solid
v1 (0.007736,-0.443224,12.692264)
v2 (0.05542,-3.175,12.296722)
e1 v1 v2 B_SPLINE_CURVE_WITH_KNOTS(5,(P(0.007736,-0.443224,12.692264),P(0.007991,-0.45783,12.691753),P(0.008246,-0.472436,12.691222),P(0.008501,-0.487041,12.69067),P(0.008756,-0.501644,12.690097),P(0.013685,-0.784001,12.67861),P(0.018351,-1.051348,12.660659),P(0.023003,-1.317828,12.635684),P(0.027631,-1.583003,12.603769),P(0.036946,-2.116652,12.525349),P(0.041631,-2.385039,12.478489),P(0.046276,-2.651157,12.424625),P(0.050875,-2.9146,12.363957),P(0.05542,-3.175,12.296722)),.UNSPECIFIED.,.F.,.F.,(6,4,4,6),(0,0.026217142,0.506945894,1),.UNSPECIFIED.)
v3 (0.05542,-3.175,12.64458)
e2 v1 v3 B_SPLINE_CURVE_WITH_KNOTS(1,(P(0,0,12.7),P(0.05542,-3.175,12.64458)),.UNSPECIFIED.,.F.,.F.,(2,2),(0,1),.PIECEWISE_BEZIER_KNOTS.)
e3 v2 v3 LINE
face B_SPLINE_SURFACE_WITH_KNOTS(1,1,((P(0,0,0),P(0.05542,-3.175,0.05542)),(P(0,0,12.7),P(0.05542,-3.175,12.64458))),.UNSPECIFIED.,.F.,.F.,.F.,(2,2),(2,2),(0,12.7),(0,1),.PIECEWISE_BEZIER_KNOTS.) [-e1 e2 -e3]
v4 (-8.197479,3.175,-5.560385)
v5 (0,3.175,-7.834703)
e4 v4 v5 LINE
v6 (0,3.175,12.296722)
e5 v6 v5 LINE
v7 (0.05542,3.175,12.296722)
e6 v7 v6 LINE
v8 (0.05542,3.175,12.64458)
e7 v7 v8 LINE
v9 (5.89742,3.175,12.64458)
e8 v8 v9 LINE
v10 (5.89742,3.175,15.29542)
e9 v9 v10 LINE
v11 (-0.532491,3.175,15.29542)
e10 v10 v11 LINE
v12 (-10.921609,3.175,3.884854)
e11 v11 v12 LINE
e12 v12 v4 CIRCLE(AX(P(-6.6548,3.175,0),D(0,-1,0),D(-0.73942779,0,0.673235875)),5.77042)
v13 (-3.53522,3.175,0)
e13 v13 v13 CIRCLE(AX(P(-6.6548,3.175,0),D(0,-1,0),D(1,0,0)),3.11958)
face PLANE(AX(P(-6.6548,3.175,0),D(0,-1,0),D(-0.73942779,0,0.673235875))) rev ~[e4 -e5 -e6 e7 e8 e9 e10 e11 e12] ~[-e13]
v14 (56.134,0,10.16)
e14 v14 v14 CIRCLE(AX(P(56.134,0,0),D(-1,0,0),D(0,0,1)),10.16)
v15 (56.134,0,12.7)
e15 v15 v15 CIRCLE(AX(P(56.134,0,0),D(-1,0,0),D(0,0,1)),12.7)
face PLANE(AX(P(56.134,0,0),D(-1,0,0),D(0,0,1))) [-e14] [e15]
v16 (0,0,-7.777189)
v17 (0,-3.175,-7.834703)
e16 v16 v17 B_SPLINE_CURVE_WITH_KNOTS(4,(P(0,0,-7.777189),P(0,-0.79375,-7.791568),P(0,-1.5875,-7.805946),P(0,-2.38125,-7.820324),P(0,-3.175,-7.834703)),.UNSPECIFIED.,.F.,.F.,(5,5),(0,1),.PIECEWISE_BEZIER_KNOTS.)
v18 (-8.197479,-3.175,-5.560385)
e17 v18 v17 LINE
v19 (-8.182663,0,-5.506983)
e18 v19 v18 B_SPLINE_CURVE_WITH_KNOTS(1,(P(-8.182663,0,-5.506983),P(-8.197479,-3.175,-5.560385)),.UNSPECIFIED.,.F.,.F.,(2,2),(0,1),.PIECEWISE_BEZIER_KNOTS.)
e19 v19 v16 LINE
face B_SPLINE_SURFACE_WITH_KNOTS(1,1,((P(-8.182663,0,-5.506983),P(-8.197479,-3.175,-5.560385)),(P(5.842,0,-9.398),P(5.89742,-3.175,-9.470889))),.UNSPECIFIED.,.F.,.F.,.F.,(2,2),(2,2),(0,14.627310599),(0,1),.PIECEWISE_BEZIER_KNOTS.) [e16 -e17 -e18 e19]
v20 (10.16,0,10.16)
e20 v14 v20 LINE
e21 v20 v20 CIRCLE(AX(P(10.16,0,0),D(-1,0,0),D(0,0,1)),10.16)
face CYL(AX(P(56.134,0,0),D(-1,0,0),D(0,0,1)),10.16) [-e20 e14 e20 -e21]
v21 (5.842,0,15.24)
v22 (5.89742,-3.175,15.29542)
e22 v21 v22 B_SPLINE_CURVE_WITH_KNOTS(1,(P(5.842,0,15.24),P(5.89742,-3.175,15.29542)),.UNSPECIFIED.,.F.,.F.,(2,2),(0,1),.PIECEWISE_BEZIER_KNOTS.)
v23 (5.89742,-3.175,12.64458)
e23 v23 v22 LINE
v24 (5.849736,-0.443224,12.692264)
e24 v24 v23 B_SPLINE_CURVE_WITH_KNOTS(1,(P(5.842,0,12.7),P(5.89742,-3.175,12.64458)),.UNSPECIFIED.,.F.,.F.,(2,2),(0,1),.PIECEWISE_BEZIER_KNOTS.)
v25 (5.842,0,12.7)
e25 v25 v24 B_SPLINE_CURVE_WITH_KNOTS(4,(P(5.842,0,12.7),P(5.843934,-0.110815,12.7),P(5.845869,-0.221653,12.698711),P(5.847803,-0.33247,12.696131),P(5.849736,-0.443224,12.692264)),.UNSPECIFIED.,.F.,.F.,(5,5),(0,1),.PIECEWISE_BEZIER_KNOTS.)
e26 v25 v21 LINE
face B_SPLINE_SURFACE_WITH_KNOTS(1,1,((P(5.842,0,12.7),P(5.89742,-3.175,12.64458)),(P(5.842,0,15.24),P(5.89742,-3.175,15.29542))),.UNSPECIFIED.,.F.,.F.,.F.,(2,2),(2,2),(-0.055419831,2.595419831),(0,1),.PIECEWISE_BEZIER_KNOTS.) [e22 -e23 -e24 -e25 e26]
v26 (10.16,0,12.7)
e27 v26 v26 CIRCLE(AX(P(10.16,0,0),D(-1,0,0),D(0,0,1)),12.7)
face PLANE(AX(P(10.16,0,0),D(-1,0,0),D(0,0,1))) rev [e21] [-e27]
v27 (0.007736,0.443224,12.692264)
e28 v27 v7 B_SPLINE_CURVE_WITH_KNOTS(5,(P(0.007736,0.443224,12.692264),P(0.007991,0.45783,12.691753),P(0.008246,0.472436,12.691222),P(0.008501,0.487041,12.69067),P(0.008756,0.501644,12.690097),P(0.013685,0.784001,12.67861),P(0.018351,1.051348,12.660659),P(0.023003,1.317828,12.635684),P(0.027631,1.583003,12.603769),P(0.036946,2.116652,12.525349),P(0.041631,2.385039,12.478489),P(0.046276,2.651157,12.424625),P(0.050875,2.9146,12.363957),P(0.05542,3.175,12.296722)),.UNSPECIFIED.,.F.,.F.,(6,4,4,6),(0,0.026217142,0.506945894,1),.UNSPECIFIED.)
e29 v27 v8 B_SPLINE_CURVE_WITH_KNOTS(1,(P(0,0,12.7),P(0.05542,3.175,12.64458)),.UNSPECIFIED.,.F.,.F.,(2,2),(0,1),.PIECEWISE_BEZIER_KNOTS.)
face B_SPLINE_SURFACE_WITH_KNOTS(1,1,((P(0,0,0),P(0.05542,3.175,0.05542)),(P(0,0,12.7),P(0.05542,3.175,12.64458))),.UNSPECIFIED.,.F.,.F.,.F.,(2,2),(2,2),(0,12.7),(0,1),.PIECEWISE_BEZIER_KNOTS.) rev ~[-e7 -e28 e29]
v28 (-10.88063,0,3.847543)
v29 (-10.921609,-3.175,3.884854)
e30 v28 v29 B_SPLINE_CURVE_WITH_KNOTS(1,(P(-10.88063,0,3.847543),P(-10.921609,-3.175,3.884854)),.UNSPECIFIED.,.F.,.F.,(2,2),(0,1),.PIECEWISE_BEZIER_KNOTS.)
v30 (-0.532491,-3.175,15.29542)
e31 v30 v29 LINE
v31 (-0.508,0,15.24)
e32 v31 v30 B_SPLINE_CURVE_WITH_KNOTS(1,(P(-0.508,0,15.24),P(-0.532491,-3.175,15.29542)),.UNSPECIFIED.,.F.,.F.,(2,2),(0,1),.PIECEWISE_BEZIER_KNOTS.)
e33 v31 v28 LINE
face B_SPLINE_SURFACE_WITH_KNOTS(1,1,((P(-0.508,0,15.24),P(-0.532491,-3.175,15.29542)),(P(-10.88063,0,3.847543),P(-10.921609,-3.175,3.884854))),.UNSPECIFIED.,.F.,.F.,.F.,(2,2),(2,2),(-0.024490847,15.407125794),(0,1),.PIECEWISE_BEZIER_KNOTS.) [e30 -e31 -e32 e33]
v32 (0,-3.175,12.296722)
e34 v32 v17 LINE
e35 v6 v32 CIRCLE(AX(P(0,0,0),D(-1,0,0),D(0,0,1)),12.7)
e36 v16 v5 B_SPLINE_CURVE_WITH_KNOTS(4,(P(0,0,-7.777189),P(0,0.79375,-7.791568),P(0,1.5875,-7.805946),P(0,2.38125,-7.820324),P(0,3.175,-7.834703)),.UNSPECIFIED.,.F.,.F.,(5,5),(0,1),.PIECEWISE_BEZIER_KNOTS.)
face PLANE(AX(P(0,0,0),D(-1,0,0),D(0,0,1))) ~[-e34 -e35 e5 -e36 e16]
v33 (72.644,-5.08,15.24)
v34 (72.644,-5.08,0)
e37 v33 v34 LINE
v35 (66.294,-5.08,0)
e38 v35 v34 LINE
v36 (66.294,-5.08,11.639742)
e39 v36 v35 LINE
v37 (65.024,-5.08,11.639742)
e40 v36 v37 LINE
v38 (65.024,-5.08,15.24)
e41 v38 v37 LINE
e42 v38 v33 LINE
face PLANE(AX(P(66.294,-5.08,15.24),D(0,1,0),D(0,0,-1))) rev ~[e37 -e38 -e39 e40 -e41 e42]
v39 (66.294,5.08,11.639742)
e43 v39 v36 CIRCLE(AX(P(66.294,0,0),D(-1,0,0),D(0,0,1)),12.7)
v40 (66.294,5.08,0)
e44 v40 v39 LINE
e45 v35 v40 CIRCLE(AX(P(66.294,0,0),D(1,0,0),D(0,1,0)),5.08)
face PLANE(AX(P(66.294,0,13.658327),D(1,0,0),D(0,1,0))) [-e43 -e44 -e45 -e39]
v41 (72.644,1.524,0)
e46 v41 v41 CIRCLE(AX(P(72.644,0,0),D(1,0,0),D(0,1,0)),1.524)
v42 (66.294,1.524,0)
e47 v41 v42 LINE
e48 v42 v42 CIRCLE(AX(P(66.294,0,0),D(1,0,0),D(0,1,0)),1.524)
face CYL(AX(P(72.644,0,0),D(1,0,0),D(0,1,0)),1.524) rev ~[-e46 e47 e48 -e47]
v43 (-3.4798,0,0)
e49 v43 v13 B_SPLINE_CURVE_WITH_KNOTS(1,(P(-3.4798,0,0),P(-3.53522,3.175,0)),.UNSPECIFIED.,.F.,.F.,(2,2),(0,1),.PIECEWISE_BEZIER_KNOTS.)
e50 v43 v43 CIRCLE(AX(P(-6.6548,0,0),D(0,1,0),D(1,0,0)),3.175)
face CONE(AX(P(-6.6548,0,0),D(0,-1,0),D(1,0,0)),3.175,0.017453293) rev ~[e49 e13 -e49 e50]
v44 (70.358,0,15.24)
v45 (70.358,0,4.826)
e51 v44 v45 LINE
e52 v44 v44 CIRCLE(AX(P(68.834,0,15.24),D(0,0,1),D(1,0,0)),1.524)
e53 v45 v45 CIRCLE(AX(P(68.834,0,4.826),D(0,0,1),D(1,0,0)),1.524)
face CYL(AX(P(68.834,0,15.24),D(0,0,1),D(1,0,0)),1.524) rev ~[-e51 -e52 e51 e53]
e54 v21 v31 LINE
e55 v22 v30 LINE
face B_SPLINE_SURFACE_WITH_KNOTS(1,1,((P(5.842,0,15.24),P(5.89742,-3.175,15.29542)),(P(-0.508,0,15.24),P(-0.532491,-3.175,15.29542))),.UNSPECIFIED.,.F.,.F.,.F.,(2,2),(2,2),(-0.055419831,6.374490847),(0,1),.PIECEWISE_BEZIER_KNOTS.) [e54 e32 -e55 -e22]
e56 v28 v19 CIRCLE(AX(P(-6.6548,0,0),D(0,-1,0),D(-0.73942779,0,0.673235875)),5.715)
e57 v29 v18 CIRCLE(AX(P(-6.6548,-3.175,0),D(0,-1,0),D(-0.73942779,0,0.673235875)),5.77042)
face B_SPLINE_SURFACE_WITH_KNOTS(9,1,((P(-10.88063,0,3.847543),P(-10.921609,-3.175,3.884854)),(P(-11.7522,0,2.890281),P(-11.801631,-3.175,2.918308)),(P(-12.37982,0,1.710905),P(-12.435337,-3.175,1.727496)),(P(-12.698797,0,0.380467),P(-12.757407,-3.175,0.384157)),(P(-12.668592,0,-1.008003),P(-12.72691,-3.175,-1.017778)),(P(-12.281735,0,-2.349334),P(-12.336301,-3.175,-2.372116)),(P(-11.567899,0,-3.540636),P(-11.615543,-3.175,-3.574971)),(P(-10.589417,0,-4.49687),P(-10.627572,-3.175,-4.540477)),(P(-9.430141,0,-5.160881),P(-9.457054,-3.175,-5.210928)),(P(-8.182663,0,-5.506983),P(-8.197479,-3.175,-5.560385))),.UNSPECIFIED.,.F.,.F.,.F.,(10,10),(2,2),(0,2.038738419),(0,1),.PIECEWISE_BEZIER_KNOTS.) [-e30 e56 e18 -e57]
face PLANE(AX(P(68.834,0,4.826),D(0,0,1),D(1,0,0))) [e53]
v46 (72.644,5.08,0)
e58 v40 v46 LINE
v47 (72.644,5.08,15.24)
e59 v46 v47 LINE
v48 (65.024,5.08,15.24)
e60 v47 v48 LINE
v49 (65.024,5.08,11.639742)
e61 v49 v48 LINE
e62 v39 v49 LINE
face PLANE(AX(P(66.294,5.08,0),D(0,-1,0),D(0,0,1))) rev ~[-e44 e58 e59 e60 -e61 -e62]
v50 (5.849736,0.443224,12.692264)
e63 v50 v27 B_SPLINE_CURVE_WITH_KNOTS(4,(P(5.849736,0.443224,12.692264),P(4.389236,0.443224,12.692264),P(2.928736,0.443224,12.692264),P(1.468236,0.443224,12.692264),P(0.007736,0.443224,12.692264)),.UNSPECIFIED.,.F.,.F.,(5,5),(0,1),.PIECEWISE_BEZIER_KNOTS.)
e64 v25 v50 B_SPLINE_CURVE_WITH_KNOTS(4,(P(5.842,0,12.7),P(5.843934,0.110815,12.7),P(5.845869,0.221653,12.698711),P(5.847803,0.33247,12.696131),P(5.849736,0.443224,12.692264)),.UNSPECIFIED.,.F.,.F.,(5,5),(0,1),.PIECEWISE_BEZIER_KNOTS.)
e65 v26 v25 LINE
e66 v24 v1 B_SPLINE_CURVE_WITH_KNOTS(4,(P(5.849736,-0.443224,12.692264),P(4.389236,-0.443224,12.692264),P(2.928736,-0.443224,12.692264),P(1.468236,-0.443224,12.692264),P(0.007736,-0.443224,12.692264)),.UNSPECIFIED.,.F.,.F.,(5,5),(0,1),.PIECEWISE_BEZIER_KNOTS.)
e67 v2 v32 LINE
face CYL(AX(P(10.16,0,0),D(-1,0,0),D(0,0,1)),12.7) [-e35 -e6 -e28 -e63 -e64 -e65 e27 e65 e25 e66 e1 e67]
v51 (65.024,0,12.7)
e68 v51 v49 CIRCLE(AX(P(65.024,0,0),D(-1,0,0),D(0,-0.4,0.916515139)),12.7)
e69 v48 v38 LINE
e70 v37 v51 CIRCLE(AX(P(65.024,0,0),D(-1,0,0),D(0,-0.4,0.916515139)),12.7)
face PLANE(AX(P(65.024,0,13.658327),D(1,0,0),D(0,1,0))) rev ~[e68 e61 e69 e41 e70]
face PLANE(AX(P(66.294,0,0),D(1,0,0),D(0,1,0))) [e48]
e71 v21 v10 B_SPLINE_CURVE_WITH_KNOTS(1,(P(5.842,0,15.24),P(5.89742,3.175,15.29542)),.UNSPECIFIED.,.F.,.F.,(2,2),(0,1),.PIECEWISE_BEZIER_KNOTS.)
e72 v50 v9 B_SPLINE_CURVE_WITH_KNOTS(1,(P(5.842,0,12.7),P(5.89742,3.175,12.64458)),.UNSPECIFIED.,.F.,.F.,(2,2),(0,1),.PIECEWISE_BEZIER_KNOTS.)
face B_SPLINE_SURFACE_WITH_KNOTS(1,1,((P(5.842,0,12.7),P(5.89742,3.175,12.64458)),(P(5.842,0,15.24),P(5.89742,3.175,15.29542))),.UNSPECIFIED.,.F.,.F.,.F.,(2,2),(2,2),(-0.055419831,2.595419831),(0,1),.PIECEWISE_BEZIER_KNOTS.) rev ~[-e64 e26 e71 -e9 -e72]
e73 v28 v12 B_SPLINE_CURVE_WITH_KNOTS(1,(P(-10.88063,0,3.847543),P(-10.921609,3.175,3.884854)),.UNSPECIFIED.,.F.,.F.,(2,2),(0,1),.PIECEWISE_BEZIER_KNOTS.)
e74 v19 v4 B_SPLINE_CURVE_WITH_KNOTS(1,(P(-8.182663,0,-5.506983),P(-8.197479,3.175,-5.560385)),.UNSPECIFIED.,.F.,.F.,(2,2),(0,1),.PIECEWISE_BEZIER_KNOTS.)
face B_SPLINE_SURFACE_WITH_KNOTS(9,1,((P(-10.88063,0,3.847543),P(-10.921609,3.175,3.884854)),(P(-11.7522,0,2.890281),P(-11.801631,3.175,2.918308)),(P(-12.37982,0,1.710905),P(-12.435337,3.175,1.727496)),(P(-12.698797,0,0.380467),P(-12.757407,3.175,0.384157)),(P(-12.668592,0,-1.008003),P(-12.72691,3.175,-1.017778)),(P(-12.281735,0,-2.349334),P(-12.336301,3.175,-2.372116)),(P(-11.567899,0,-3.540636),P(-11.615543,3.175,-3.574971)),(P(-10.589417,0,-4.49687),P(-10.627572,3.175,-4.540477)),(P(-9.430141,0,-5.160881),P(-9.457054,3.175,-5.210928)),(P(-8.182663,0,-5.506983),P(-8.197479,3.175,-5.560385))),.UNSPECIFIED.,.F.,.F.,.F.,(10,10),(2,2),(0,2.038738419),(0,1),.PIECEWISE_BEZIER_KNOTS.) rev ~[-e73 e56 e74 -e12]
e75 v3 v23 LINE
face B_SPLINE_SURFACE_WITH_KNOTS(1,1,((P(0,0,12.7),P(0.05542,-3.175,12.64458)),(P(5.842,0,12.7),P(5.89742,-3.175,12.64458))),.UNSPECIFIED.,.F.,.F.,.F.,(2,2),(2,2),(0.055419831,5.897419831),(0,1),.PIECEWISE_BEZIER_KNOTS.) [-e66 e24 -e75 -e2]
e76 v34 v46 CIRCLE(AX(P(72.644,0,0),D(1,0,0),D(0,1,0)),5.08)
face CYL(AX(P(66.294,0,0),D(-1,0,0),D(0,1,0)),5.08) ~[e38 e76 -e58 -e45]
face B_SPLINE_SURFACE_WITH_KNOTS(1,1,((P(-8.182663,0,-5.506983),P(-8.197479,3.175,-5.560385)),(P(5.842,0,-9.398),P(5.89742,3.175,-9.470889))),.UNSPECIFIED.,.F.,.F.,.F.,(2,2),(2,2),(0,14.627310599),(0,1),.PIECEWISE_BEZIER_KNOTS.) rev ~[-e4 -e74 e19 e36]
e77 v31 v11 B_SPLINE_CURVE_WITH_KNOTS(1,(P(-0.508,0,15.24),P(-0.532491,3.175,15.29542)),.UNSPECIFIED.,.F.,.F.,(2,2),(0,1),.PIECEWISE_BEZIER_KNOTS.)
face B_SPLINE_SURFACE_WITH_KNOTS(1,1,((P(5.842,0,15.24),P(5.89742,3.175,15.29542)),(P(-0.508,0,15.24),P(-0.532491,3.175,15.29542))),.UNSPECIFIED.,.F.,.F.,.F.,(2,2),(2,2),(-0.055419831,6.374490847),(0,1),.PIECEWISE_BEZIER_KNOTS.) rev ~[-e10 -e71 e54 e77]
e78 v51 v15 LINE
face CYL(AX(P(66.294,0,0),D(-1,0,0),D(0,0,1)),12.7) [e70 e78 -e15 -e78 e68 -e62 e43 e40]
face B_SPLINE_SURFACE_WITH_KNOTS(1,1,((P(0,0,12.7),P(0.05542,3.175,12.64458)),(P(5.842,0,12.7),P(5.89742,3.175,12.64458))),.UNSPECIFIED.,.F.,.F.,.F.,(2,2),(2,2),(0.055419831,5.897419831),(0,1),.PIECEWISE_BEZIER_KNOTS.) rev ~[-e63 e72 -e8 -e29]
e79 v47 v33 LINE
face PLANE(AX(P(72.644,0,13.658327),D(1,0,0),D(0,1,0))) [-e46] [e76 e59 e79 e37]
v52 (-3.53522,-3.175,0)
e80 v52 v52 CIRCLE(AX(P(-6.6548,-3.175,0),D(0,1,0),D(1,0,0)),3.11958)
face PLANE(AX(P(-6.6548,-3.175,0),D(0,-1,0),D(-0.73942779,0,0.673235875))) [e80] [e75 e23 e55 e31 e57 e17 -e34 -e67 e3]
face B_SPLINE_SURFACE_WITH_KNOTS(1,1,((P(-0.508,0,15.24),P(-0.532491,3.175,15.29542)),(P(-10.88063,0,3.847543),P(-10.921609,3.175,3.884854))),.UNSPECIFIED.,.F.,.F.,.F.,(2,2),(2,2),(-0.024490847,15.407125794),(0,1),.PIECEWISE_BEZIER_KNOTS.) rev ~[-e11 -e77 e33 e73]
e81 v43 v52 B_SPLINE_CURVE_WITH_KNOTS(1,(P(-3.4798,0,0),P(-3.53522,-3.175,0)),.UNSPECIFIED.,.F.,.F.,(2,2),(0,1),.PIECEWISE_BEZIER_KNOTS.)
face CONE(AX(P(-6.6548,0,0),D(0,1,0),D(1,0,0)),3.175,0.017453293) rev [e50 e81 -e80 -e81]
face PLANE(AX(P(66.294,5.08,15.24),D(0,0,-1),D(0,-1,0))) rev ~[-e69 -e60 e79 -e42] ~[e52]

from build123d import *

# Parameters (mm, degrees)
F0_W      = 5.842
F0_H      = 12.7
F0_R      = 3.175
F2_DEPTH  = 3.175
F2_TAPER  = -1
F4_DEPTH  = 1.27
F3_R      = 1.524
F5_DEPTH  = 6.35
F6_R      = 1.524
F7_DEPTH  = 6.35
F10_R     = 1.524
F11_DEPTH = 10.414


# Not quite as in the source:
# - a feature of the source that left no trace in its solid (it failed there, or was rolled back) is left out


with BuildPart() as f1:
    # F0 (on Front) → F1 (revolve)
    with BuildSketch(Plane.XZ):
        Polygon((5.842, 12.7), (5.842, 0), (66.294, 0), (66.294, 12.7), (56.134, 12.7), (56.134, 10.16), (10.16, 10.16), (10.16, 12.7), align=None)
        with Locations((2.921, 6.35)):
            Rectangle(F0_W, F0_H)
    revolve(axis=Axis((33.147, 0, 0), (-1, 0, 0)))

    # F0 (on Front) → F2 (join, symmetric)
    with BuildSketch(Plane.XZ):
        with BuildLine():
            Line((5.842, 0), (0, 0))
            Line((0, 0), (-0.9398, 0))
            ThreePointArc((-0.9398, 0), (-3.1957909266, -4.5493385486), (-8.1826630726, -5.5069827884))
            Line((-8.1826630726, -5.5069827884), (5.842, -9.398))
            Line((5.842, -9.398), (5.842, 0))
        make_face()
        with BuildLine():
            ThreePointArc((-8.1826630726, -5.5069827884), (-3.1957909266, -4.5493385486), (-0.9398, 0))
            ThreePointArc((-0.9398, 0), (-4.5919612295, 5.3297205562), (-10.8806298187, 3.8475430269))
            ThreePointArc((-10.8806298187, 3.8475430269), (-12.1459778134, -1.5837270034), (-8.1826630726, -5.5069827884))
        make_face()
        with Locations((-6.6548, 0)):
            Circle(F0_R, mode=Mode.SUBTRACT)
        with BuildLine():
            Line((-0.9398, 0), (0, 0))
            Line((0, 0), (0, 12.7))
            Line((0, 12.7), (5.842, 12.7))
            Line((5.842, 12.7), (5.842, 15.24))
            Line((5.842, 15.24), (-0.508, 15.24))
            Line((-0.508, 15.24), (-10.8806298187, 3.8475430269))
            ThreePointArc((-10.8806298187, 3.8475430269), (-4.5919612295, 5.3297205562), (-0.9398, 0))
        make_face()
    extrude(amount=F2_DEPTH, both=True, taper=F2_TAPER)

    # F3 (on face) → F4 (join)
    with BuildSketch(Plane.YZ.offset(66.294)):
        with BuildLine():
            ThreePointArc((-5.08, 11.6397422652), (0, 12.7), (5.08, 11.6397422652))
            Line((5.08, 11.6397422652), (5.08, 15.24))
            Line((5.08, 15.24), (-5.08, 15.24))
            Line((-5.08, 15.24), (-5.08, 11.6397422652))
        make_face()
    extrude(amount=-F4_DEPTH)

    # F3 (on face) → F5 (join)
    with BuildSketch(Plane.YZ.offset(66.294)):
        with BuildLine():
            ThreePointArc((-5.08, 11.6397422652), (0, 12.7), (5.08, 11.6397422652))
            Line((5.08, 11.6397422652), (5.08, 15.24))
            Line((5.08, 15.24), (-5.08, 15.24))
            Line((-5.08, 15.24), (-5.08, 11.6397422652))
        make_face()
        with BuildLine():
            ThreePointArc((-5.08, 0), (0, 5.08), (5.08, 0))
            Line((5.08, 0), (5.08, 11.6397422652))
            ThreePointArc((5.08, 11.6397422652), (0, 12.7), (-5.08, 11.6397422652))
            Line((-5.08, 11.6397422652), (-5.08, 0))
        make_face()
        with BuildLine():
            ThreePointArc((-5.08, 0), (0, -5.08), (5.08, 0))
            ThreePointArc((5.08, 0), (0, 5.08), (-5.08, 0))
        make_face()
        Circle(F3_R, mode=Mode.SUBTRACT)
        Circle(F3_R)
    extrude(amount=F5_DEPTH)

    # F6 (on face) → F7 (cut, through all)
    with BuildSketch(Plane.YZ.offset(72.644)):
        Circle(F6_R)
    extrude(amount=-F7_DEPTH, mode=Mode.SUBTRACT)

    # F10 (on face) → F11 (cut)
    with BuildSketch(Plane.XY.offset(15.24)):
        with Locations((68.834, 0)):
            Circle(F10_R)
    extrude(amount=-F11_DEPTH, mode=Mode.SUBTRACT)


solid = f1.part
